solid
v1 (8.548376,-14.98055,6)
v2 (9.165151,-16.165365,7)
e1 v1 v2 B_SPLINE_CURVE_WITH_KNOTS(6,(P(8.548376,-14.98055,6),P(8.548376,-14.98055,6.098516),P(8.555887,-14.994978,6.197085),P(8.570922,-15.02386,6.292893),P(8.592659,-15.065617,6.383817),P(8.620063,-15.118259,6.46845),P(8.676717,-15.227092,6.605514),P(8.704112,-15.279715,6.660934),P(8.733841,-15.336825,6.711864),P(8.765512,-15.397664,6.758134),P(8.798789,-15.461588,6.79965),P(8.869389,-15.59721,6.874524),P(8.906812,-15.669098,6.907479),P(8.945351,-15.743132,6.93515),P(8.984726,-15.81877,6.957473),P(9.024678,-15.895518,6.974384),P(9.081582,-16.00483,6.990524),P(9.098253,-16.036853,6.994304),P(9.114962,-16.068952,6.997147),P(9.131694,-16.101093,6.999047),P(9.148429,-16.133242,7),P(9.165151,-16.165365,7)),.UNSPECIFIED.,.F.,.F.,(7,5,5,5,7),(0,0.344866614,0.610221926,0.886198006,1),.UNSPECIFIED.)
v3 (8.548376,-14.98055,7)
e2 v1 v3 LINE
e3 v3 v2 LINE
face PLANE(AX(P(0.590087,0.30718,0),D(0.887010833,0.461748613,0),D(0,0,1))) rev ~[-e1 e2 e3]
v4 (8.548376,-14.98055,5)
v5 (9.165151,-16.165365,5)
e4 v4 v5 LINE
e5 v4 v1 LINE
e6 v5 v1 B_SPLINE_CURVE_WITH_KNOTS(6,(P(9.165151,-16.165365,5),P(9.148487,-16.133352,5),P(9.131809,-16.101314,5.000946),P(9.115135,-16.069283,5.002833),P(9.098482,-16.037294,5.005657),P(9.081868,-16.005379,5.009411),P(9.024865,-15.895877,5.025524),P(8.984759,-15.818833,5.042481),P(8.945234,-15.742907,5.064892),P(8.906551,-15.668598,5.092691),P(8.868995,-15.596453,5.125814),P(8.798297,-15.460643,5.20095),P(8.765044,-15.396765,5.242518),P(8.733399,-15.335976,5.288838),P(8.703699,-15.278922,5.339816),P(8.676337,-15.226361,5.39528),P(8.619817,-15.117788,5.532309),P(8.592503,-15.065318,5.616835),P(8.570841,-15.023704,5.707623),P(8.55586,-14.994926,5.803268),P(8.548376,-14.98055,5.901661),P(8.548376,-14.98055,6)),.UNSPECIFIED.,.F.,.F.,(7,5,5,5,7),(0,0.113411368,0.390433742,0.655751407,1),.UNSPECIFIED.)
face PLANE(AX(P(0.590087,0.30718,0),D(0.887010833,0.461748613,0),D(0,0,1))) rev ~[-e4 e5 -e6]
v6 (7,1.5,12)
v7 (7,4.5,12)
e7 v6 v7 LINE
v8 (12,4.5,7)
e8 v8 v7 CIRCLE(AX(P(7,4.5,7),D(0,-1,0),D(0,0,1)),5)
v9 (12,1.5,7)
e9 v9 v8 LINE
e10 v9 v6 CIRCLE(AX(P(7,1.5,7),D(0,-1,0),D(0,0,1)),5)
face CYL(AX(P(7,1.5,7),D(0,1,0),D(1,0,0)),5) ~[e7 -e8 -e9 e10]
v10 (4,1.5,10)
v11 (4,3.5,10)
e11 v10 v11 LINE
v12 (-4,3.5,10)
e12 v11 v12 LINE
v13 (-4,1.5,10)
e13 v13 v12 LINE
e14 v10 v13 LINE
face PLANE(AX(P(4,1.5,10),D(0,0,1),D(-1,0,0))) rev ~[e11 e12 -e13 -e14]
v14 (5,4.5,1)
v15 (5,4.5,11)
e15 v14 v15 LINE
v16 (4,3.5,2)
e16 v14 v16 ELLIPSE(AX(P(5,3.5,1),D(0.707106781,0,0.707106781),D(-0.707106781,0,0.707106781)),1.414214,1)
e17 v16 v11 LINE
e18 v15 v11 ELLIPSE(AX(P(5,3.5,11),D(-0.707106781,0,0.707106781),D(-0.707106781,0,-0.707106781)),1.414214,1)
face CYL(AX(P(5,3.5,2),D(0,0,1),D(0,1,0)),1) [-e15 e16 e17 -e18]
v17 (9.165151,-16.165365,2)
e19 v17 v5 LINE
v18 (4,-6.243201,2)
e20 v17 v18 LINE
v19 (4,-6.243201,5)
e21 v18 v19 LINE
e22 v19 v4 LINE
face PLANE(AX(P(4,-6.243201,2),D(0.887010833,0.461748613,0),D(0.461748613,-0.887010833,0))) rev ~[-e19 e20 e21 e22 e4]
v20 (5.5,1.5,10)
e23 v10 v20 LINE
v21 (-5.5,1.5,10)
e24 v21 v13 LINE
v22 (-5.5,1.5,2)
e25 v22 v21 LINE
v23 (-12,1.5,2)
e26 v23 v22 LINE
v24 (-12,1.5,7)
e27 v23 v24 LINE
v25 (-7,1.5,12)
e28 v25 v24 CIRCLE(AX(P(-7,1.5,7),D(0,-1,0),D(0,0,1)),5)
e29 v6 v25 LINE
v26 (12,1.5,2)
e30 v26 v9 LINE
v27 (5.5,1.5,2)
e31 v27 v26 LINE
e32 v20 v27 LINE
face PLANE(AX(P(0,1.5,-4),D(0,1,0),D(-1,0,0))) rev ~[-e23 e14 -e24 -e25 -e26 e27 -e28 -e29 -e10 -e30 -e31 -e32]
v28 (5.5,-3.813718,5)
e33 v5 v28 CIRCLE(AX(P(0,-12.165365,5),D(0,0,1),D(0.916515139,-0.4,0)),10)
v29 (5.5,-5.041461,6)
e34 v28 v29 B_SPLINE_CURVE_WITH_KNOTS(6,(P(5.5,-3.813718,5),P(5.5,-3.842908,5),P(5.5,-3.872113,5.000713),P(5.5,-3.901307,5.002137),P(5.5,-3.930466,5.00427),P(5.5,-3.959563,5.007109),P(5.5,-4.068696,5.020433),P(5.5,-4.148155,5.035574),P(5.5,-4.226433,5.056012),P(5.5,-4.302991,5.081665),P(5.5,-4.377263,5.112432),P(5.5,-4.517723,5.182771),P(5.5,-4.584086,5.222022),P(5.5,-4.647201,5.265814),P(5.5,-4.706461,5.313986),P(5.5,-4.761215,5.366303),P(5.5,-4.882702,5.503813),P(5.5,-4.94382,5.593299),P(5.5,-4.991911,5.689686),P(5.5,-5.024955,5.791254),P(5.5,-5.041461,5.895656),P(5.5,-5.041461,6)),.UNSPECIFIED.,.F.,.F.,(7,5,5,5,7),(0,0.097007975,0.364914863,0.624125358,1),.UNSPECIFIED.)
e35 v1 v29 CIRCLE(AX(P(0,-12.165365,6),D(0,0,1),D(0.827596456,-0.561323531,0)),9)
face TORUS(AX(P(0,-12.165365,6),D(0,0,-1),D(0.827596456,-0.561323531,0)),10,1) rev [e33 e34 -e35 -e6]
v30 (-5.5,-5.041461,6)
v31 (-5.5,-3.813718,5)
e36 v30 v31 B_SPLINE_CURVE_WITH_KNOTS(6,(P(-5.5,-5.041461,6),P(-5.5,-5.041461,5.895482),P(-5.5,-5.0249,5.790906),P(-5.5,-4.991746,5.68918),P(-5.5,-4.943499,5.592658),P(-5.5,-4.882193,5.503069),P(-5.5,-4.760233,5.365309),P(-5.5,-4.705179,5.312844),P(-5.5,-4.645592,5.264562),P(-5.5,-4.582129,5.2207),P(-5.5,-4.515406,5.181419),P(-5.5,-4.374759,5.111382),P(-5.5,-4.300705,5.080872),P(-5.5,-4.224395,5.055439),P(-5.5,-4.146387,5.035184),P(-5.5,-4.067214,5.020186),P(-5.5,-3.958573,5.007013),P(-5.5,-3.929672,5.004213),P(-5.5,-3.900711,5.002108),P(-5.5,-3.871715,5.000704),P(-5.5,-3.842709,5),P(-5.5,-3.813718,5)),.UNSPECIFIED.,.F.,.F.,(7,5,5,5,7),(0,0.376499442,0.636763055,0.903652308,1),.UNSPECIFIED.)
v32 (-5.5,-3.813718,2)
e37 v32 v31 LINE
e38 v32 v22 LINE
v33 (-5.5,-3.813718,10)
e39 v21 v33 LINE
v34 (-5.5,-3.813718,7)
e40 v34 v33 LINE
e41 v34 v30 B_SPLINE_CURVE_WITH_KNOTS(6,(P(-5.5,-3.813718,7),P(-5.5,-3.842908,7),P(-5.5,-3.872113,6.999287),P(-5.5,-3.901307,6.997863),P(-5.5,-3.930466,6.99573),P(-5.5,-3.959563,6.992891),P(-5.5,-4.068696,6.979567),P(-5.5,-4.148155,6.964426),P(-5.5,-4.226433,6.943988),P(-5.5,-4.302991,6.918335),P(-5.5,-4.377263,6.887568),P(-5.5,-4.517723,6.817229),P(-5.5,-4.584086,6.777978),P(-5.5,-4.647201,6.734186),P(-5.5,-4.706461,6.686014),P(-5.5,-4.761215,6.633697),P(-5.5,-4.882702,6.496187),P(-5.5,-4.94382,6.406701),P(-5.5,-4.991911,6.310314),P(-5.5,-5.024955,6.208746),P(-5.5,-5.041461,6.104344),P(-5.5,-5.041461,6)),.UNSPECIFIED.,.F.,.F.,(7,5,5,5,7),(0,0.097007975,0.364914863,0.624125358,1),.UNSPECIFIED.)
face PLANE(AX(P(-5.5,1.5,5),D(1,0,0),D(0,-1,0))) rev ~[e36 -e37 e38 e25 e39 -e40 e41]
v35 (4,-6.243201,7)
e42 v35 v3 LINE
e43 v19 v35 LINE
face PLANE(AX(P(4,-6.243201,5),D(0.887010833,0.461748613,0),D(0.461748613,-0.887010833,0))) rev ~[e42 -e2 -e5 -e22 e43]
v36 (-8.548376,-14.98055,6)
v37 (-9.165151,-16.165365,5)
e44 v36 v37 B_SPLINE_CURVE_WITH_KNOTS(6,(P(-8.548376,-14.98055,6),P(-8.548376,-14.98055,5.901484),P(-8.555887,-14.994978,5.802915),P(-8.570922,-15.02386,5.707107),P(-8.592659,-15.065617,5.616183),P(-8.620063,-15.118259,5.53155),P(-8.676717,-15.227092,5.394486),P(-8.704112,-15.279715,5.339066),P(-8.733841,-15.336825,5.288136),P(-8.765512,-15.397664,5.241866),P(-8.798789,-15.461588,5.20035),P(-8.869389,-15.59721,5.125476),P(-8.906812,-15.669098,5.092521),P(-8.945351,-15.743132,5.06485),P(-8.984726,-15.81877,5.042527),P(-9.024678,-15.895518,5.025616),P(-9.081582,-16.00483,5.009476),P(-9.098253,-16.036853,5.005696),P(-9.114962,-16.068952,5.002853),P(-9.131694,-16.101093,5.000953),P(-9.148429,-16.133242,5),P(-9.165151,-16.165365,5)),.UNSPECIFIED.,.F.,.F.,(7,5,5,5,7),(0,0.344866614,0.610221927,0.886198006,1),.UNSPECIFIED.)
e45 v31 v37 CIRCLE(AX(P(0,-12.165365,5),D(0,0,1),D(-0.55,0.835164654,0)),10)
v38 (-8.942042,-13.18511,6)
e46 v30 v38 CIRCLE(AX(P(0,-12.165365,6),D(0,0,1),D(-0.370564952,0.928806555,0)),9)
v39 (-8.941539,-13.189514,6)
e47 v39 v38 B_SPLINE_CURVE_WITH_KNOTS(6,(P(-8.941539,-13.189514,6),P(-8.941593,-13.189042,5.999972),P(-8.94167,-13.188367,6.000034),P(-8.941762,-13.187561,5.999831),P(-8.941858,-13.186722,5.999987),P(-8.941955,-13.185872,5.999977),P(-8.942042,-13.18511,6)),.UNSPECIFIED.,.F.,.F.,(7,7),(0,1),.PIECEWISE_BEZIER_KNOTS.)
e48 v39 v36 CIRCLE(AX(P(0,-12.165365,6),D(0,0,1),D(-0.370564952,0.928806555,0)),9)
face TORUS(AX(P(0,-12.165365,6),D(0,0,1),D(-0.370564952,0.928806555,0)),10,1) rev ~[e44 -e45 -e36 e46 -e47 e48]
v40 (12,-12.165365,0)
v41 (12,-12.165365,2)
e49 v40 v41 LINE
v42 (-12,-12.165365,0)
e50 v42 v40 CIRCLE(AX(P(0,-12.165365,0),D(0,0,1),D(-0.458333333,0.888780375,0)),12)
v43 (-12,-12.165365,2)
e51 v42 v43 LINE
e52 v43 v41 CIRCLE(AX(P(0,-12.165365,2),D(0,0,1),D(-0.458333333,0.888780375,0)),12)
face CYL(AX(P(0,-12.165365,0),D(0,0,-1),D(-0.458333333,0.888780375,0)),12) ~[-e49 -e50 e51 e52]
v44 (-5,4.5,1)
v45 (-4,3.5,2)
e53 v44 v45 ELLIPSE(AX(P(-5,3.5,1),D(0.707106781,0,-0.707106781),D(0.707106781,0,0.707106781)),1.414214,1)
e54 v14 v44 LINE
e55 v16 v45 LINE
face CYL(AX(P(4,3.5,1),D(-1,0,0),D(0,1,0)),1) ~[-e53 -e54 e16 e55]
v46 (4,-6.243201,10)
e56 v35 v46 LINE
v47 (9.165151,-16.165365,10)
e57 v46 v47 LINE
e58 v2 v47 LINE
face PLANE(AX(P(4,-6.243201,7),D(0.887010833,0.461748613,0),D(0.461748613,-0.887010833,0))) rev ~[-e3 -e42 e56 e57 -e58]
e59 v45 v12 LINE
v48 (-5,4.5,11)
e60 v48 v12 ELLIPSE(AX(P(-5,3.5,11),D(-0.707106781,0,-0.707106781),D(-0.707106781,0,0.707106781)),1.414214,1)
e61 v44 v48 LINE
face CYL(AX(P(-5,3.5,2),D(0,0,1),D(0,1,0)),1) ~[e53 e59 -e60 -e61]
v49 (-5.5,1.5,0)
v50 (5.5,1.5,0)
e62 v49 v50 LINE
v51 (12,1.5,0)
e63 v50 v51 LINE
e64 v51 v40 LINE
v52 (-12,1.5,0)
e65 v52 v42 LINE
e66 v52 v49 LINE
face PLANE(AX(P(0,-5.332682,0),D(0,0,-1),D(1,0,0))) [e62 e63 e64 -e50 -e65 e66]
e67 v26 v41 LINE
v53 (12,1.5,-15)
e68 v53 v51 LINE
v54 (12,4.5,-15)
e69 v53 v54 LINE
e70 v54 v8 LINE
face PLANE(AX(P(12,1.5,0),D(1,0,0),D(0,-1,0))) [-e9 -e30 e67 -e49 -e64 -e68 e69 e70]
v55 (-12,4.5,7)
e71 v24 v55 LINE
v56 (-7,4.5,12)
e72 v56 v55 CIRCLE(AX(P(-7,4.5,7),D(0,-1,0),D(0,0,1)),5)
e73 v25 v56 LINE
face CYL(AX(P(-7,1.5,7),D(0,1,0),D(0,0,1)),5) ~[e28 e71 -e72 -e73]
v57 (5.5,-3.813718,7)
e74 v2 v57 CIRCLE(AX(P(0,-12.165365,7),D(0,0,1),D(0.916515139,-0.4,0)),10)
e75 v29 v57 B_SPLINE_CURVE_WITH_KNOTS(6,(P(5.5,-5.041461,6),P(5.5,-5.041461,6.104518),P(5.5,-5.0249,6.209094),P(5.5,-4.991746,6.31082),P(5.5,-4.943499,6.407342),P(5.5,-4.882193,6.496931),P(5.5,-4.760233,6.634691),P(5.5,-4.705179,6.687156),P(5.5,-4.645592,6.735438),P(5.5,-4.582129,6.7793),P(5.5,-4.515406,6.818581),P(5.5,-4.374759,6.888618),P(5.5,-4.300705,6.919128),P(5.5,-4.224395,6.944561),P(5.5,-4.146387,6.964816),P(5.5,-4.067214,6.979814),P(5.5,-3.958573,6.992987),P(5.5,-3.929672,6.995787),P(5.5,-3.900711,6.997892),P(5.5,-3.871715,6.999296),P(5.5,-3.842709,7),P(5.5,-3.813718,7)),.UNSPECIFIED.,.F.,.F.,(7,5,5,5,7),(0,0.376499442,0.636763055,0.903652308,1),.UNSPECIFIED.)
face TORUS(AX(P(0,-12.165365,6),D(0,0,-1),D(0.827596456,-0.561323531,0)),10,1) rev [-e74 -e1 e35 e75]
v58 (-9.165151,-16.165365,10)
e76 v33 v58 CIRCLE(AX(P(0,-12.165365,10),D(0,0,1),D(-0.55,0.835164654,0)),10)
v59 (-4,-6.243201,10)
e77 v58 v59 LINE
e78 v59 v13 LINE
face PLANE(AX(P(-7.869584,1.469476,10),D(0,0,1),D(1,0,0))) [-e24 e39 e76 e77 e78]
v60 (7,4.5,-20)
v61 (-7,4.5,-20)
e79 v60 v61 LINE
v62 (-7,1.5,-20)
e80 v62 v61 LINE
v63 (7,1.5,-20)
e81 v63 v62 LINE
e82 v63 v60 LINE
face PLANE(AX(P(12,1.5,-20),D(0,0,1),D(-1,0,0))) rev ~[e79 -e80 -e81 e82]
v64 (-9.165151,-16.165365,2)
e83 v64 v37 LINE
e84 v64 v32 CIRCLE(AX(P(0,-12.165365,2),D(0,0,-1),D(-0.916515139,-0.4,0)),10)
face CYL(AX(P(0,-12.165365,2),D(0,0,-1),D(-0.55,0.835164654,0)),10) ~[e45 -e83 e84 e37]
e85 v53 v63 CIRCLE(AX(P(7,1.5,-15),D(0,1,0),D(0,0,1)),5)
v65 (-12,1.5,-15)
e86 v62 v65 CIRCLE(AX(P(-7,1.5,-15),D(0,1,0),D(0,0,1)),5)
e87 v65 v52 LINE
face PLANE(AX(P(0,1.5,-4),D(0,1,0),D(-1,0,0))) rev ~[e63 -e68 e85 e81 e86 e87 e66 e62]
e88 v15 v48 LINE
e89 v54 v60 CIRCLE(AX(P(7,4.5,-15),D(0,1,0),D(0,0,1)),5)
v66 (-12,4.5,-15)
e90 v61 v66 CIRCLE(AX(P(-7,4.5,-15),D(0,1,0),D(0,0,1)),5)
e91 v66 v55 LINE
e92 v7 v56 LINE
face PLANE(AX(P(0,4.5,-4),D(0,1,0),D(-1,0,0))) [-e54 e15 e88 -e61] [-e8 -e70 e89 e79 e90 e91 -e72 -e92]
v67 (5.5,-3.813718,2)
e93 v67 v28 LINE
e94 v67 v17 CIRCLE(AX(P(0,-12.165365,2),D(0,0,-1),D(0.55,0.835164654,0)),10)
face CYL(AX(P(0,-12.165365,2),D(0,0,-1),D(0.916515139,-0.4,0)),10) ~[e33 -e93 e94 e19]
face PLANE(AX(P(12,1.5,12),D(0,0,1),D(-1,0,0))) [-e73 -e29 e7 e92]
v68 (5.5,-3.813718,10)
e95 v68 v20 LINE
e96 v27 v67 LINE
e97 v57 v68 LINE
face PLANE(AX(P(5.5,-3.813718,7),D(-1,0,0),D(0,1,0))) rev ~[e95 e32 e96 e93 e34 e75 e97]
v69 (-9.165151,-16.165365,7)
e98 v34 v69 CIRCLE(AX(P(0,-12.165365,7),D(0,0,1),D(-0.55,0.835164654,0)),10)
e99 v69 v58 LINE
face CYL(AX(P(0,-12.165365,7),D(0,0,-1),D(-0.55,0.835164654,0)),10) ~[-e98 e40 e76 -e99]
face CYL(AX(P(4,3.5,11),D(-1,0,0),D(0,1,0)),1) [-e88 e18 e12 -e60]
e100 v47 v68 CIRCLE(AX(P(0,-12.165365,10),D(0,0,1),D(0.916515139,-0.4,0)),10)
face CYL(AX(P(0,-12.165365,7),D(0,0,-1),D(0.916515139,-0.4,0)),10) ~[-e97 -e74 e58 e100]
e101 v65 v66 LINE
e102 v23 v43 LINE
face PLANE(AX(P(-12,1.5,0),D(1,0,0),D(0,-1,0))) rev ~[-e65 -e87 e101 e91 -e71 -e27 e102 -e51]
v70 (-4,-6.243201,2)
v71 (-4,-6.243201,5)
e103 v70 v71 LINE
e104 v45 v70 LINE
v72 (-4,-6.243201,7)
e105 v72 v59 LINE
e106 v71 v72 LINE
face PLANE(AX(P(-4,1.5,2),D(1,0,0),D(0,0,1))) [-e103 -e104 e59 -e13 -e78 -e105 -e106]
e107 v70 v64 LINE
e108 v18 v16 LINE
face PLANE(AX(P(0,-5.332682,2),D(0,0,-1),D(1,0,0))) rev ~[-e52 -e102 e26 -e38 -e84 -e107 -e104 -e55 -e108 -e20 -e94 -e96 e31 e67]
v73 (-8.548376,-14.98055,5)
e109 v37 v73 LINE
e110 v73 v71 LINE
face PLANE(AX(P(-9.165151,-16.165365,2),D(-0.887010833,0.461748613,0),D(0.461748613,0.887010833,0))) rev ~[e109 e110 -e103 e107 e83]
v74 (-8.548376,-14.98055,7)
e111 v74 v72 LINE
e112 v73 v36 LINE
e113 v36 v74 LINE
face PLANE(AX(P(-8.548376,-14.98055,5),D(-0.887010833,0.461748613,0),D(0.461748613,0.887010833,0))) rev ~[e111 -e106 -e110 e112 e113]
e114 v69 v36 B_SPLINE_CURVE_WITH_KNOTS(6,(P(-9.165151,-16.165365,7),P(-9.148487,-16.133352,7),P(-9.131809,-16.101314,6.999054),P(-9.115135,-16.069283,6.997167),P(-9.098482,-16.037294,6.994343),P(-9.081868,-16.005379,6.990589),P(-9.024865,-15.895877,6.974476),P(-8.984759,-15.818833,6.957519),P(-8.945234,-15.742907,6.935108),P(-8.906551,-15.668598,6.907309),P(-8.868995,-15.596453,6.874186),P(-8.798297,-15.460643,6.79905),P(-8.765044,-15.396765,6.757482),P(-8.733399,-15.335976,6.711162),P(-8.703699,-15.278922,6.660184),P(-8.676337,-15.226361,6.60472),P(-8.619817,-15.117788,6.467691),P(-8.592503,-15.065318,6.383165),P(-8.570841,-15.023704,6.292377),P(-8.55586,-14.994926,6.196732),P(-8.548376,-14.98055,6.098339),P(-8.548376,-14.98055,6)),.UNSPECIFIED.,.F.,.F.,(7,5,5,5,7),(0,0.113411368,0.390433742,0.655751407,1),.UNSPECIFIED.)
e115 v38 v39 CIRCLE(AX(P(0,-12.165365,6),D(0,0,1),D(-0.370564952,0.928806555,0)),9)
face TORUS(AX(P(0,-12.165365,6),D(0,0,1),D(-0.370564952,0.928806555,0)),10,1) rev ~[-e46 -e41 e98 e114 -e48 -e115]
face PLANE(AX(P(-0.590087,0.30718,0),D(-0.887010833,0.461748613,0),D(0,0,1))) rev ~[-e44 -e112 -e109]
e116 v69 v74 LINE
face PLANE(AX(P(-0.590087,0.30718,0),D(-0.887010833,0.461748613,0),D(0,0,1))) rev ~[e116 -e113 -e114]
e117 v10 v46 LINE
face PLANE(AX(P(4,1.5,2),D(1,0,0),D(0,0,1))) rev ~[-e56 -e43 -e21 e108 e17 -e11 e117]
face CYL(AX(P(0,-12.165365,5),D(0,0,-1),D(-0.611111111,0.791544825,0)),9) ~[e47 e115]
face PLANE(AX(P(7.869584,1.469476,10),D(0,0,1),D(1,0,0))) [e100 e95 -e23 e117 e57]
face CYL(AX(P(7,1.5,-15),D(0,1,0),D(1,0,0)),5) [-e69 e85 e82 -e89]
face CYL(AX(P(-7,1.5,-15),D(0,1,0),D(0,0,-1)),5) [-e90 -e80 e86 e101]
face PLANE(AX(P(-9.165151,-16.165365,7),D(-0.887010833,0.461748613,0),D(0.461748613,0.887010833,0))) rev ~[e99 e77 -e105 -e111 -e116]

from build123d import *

# Parameters (mm, degrees)
F1_DEPTH     = 2
F3_DEPTH     = 3
F5_DEPTH     = 2
F7_DEPTH     = 3
F8_T4_ANGLE  = 102.3969146675
F8_T10_ANGLE = 102.3969146675
F8_T16_ANGLE = 102.3969146675
F8_T22_ANGLE = 102.3969146675
F8_T26_ANGLE = 121.7069479791
F8_T28_ANGLE = 121.7069479791
F8_T30_ANGLE = 121.7069479791
F8_T32_ANGLE = 121.7069479791
F9_W         = 24
F9_H         = 22.6653645039
F10_DEPTH    = 10
F11_W        = 24
F11_H        = 32
F11_W_2      = 8
F11_H_2      = 8
F12_DEPTH    = 3
F13_R        = 1
F14_R        = 5
F15_W        = 24
F15_H        = 13.6653645039
F16_DEPTH    = 2


# Not quite as in the source:
# - a fillet or chamfer that OpenCascade refuses, or shapes differently, is made with other operations: its cross-section is extruded or revolved along the edge and cut away or added


with BuildPart() as f1:
    # F0 (on Top) → F1 (new body)
    with BuildSketch(Plane.XY):
        with BuildLine():
            ThreePointArc((5.5, 1.5), (0, 24.1653645039), (-5.5, 1.5))
            Line((-5.5, 1.5), (-5.5, -1.5))
            ThreePointArc((-5.5, -1.5), (0, -24.1653645039), (5.5, -1.5))
            Line((5.5, -1.5), (5.5, 1.5))
        make_face()
    extrude(amount=F1_DEPTH)

    # F2 (on face) → F3 (join)
    with BuildSketch(Plane.XY.offset(2)):
        with BuildLine():
            Line((9.7844830762, 19.1125863177), (8.6602540378, 17.1653645039))
            ThreePointArc((8.6602540378, 17.1653645039), (9.4991255677, 9.0402063559), (4, 3.0002131139))
            Line((4, 3.0002131139), (4, -6.2432010007))
            Line((4, -6.2432010007), (9.1651513899, -16.1653645039))
            ThreePointArc((9.1651513899, -16.1653645039), (9.5868378212, -9.3206253964), (5.5, -3.8137179596))
            Line((5.5, -3.8137179596), (5.5, 1.5))
            ThreePointArc((5.5, 1.5), (11.6599594736, 9.3289327537), (9.7844830762, 19.1125863177))
        make_face()
        with BuildLine():
            ThreePointArc((-4, 3.0002131139), (-9.4991255677, 9.0402063559), (-8.6602540378, 17.1653645039))
            Line((-8.6602540378, 17.1653645039), (-9.7844830762, 19.1125863177))
            ThreePointArc((-9.7844830762, 19.1125863177), (-11.6599594736, 9.3289327537), (-5.5, 1.5))
            Line((-5.5, 1.5), (-5.5, -3.8137179596))
            ThreePointArc((-5.5, -3.8137179596), (-9.5868378212, -9.3206253964), (-9.1651513899, -16.1653645039))
            Line((-9.1651513899, -16.1653645039), (-4, -6.2432010007))
            Line((-4, -6.2432010007), (-4, 3.0002131139))
        make_face()
    extrude(amount=F3_DEPTH)

    # F4 (on face) → F5 (join)
    with BuildSketch(Plane.XY.offset(5)):
        with BuildLine():
            Line((-8.0717844057, 16.1461052023), (-9.7844830762, 19.1125863177))
            ThreePointArc((-9.7844830762, 19.1125863177), (-11.6599594736, 9.3289327537), (-5.5, 1.5))
            Line((-5.5, 1.5), (-5.5, -5.0414610795))
            ThreePointArc((-5.5, -5.0414610795), (-8.6043935433, -9.5263473097), (-8.5483759414, -14.980549891))
            Line((-8.5483759414, -14.980549891), (-4, -6.2432010007))
            Line((-4, -6.2432010007), (-4, 4.1031067556))
            ThreePointArc((-4, 4.1031067556), (-8.5258693153, 9.2827350759), (-8.0717844057, 16.1461052023))
        make_face()
        with BuildLine():
            ThreePointArc((5.5, 1.5), (11.6599594736, 9.3289327537), (9.7844830762, 19.1125863177))
            Line((9.7844830762, 19.1125863177), (8.0717844057, 16.1461052023))
            ThreePointArc((8.0717844057, 16.1461052023), (8.5258693153, 9.2827350759), (4, 4.1031067556))
            Line((4, 4.1031067556), (4, -6.2432010007))
            Line((4, -6.2432010007), (8.5483759414, -14.980549891))
            ThreePointArc((8.5483759414, -14.980549891), (8.6043935433, -9.5263473097), (5.5, -5.0414610795))
            Line((5.5, -5.0414610795), (5.5, 1.5))
        make_face()
    extrude(amount=F5_DEPTH)

    # F6 (on face) → F7 (join)
    with BuildSketch(Plane.XY.offset(7)):
        with BuildLine():
            Line((9.7844830762, 19.1125863177), (8.6602540378, 17.1653645039))
            ThreePointArc((8.6602540378, 17.1653645039), (9.4991255677, 9.0402063559), (4, 3.0002131139))
            Line((4, 3.0002131139), (4, -6.2432010007))
            Line((4, -6.2432010007), (9.1651513899, -16.1653645039))
            ThreePointArc((9.1651513899, -16.1653645039), (9.5868378212, -9.3206253964), (5.5, -3.8137179596))
            Line((5.5, -3.8137179596), (5.5, 1.5))
            ThreePointArc((5.5, 1.5), (11.6599594736, 9.3289327537), (9.7844830762, 19.1125863177))
        make_face()
        with BuildLine():
            ThreePointArc((-4, 3.0002131139), (-9.4991255677, 9.0402063559), (-8.6602540378, 17.1653645039))
            Line((-8.6602540378, 17.1653645039), (-9.7844830762, 19.1125863177))
            ThreePointArc((-9.7844830762, 19.1125863177), (-11.6599594736, 9.3289327537), (-5.5, 1.5))
            Line((-5.5, 1.5), (-5.5, -3.8137179596))
            ThreePointArc((-5.5, -3.8137179596), (-9.5868378212, -9.3206253964), (-9.1651513899, -16.1653645039))
            Line((-9.1651513899, -16.1653645039), (-4, -6.2432010007))
            Line((-4, -6.2432010007), (-4, 3.0002131139))
        make_face()
    extrude(amount=F7_DEPTH)

    # F8: fillet of radius 1 on 8 edges, made by hand


with BuildPart() as f8_tool2:
    # F8_s3 → F8_t4 (revolve)
    with BuildSketch(Plane(origin=(-4.1871135562, -1.6705281924, 0), x_dir=(0, 0, 1), z_dir=(0.9288065548, 0.3705649522, 0))):
        with BuildLine():
            ThreePointArc((6, 2.2992702923), (5.2928932188, 2.0063770734), (5, 1.2992702923))
            Line((5, 1.2992702923), (5, 2.2992702923))
            Line((5, 2.2992702923), (6, 2.2992702923))
        make_face()
    revolve(axis=Axis((0, -12.1653645039, 5), (0, 0, 1)), revolution_arc=F8_T4_ANGLE)

    split(bisect_by=Plane(origin=(-0.5900874414, 0.3071800789, 0), x_dir=(0, 0, 1), z_dir=(-0.8870108332, 0.4617486132, 0)), keep=Keep.TOP)

    split(bisect_by=Plane.YZ.offset(-4), keep=Keep.BOTTOM)


with BuildPart() as f1_1:
    add(f1.part)

    # F8_t1: union F8_tool2
    add(f8_tool2.part)


with BuildPart() as f8_tool8:
    # F8_s9 → F8_t10 (revolve)
    with BuildSketch(Plane(origin=(-4.1871135562, -1.6705281924, 0), x_dir=(0, 0, 1), z_dir=(0.9288065548, 0.3705649522, 0))):
        with BuildLine():
            ThreePointArc((7, 1.2992702923), (6.7071067812, 2.0063770734), (6, 2.2992702923))
            Line((6, 2.2992702923), (7, 2.2992702923))
            Line((7, 2.2992702923), (7, 1.2992702923))
        make_face()
    revolve(axis=Axis((0, -12.1653645039, 7), (0, 0, 1)), revolution_arc=F8_T10_ANGLE)

    split(bisect_by=Plane(origin=(-0.5900874414, 0.3071800789, 0), x_dir=(0, 0, 1), z_dir=(-0.8870108332, 0.4617486132, 0)), keep=Keep.TOP)

    split(bisect_by=Plane.YZ.offset(-4), keep=Keep.BOTTOM)


with BuildPart() as f1_2:
    add(f1_1.part)

    # F8_t7: union F8_tool8
    add(f8_tool8.part)


with BuildPart() as f8_tool14:
    # F8_s15 → F8_t16 (revolve)
    with BuildSketch(Plane(origin=(-5.6514123525, -8.3322514997, 0), x_dir=(0, 0, 1), z_dir=(-0.561323531, -0.8275964557, 0))):
        with BuildLine():
            ThreePointArc((6, -15.828705359), (6.7071067812, -16.1215985778), (7, -16.828705359))
            Line((7, -16.828705359), (7, -15.828705359))
            Line((7, -15.828705359), (6, -15.828705359))
        make_face()
    revolve(axis=Axis((0, -12.1653645039, 7), (0, 0, 1)), revolution_arc=F8_T16_ANGLE)

    split(bisect_by=Plane.YZ.offset(4), keep=Keep.TOP)

    split(bisect_by=Plane(origin=(0.5900874414, 0.3071800789, 0), x_dir=(0, 0, 1), z_dir=(0.8870108332, 0.4617486132, 0)), keep=Keep.TOP)


with BuildPart() as f1_3:
    add(f1_2.part)

    # F8_t13: union F8_tool14
    add(f8_tool14.part)


with BuildPart() as f8_tool20:
    # F8_s21 → F8_t22 (revolve)
    with BuildSketch(Plane(origin=(-5.6514123525, -8.3322514997, 0), x_dir=(0, 0, 1), z_dir=(-0.561323531, -0.8275964557, 0))):
        with BuildLine():
            ThreePointArc((5, -16.828705359), (5.2928932188, -16.1215985778), (6, -15.828705359))
            Line((6, -15.828705359), (5, -15.828705359))
            Line((5, -15.828705359), (5, -16.828705359))
        make_face()
    revolve(axis=Axis((0, -12.1653645039, 5), (0, 0, 1)), revolution_arc=F8_T22_ANGLE)

    split(bisect_by=Plane.YZ.offset(4), keep=Keep.TOP)

    split(bisect_by=Plane(origin=(0.5900874414, 0.3071800789, 0), x_dir=(0, 0, 1), z_dir=(0.8870108332, 0.4617486132, 0)), keep=Keep.TOP)


with BuildPart() as f1_4:
    add(f1_3.part)

    # F8_t19: union F8_tool20
    add(f8_tool20.part)

    # F8_s25 → F8_t26 (revolve, cut)
    with BuildSketch(Plane(origin=(-6.0530874143, 6.6819786169, 0), x_dir=(0, 0, 1), z_dir=(-0.6713698624, 0.7411224648, 0))):
        with BuildLine():
            ThreePointArc((7, 18.1674590926), (6.7071067812, 17.4603523114), (6, 17.1674590926))
            Line((6, 17.1674590926), (7, 17.1674590926))
            Line((7, 17.1674590926), (7, 18.1674590926))
        make_face()
    revolve(axis=Axis((0, 12.1653645039, 7), (0, 0, -1)), revolution_arc=F8_T26_ANGLE, mode=Mode.SUBTRACT)

    # F8_s27 → F8_t28 (revolve, cut)
    with BuildSketch(Plane(origin=(-2.1730837017, 0.4014208952, 0), x_dir=(0, 0, 1), z_dir=(0.9833630917, -0.1816508459, 0))):
        with BuildLine():
            ThreePointArc((6, -2.9629704506), (6.7071067812, -2.6700772318), (7, -1.9629704506))
            Line((7, -1.9629704506), (7, -2.9629704506))
            Line((7, -2.9629704506), (6, -2.9629704506))
        make_face()
    revolve(axis=Axis((0, 12.1653645039, 7), (0, 0, -1)), revolution_arc=F8_T28_ANGLE, mode=Mode.SUBTRACT)

    # F8_s29 → F8_t30 (revolve, cut)
    with BuildSketch(Plane(origin=(-2.1730837017, 0.4014208952, 0), x_dir=(0, 0, 1), z_dir=(0.9833630917, -0.1816508459, 0))):
        with BuildLine():
            ThreePointArc((5, -1.9629704506), (5.2928932188, -2.6700772318), (6, -2.9629704506))
            Line((6, -2.9629704506), (5, -2.9629704506))
            Line((5, -2.9629704506), (5, -1.9629704506))
        make_face()
    revolve(axis=Axis((0, 12.1653645039, 5), (0, 0, -1)), revolution_arc=F8_T30_ANGLE, mode=Mode.SUBTRACT)

    # F8_s31 → F8_t32 (revolve, cut)
    with BuildSketch(Plane(origin=(-6.0530874143, 6.6819786169, 0), x_dir=(0, 0, 1), z_dir=(-0.6713698624, 0.7411224648, 0))):
        with BuildLine():
            ThreePointArc((6, 17.1674590926), (5.2928932188, 17.4603523114), (5, 18.1674590926))
            Line((5, 18.1674590926), (5, 17.1674590926))
            Line((5, 17.1674590926), (6, 17.1674590926))
        make_face()
    revolve(axis=Axis((0, 12.1653645039, 5), (0, 0, -1)), revolution_arc=F8_T32_ANGLE, mode=Mode.SUBTRACT)

    # F9 (on face) → F10 (cut)
    with BuildSketch(Plane.XY.offset(10)):
        with Locations((0, 12.8326822519)):
            Rectangle(F9_W, F9_H)
    extrude(amount=-F10_DEPTH, mode=Mode.SUBTRACT)

    # F11 (on face) → F12 (join)
    with BuildSketch(Plane(origin=(0, 1.5, 0), x_dir=(-1, 0, 0), z_dir=(0, 1, 0))):
        with Locations((0, -4)):
            Rectangle(F11_W, F11_H)
        with Locations((0, 6)):
            Rectangle(F11_W_2, F11_H_2, mode=Mode.SUBTRACT)
    extrude(amount=F12_DEPTH)

    # F13
    f13_edges = [f1_4.edges().sort_by_distance(p)[0] for p in [
        (0, 4.5, 10),
        (4, 4.5, 6),
        (-4, 4.5, 6),
        (0, 4.5, 2),
    ]]
    fillet(f13_edges, radius=F13_R)

    # F14
    f14_edges = [f1_4.edges().sort_by_distance(p)[0] for p in [
        (12, 3, 12),
        (-12, 3, 12),
        (-12, 3, -20),
        (12, 3, -20),
    ]]
    fillet(f14_edges, radius=F14_R)

    # F15 (on face) → F16 (join)
    with BuildSketch(Plane(origin=(0, 0, 0), x_dir=(1, 0, 0), z_dir=(0, 0, -1))):
        with Locations((0, 5.3326822519)):
            Rectangle(F15_W, F15_H)
    extrude(amount=-F16_DEPTH)


solid = f1_4.part
